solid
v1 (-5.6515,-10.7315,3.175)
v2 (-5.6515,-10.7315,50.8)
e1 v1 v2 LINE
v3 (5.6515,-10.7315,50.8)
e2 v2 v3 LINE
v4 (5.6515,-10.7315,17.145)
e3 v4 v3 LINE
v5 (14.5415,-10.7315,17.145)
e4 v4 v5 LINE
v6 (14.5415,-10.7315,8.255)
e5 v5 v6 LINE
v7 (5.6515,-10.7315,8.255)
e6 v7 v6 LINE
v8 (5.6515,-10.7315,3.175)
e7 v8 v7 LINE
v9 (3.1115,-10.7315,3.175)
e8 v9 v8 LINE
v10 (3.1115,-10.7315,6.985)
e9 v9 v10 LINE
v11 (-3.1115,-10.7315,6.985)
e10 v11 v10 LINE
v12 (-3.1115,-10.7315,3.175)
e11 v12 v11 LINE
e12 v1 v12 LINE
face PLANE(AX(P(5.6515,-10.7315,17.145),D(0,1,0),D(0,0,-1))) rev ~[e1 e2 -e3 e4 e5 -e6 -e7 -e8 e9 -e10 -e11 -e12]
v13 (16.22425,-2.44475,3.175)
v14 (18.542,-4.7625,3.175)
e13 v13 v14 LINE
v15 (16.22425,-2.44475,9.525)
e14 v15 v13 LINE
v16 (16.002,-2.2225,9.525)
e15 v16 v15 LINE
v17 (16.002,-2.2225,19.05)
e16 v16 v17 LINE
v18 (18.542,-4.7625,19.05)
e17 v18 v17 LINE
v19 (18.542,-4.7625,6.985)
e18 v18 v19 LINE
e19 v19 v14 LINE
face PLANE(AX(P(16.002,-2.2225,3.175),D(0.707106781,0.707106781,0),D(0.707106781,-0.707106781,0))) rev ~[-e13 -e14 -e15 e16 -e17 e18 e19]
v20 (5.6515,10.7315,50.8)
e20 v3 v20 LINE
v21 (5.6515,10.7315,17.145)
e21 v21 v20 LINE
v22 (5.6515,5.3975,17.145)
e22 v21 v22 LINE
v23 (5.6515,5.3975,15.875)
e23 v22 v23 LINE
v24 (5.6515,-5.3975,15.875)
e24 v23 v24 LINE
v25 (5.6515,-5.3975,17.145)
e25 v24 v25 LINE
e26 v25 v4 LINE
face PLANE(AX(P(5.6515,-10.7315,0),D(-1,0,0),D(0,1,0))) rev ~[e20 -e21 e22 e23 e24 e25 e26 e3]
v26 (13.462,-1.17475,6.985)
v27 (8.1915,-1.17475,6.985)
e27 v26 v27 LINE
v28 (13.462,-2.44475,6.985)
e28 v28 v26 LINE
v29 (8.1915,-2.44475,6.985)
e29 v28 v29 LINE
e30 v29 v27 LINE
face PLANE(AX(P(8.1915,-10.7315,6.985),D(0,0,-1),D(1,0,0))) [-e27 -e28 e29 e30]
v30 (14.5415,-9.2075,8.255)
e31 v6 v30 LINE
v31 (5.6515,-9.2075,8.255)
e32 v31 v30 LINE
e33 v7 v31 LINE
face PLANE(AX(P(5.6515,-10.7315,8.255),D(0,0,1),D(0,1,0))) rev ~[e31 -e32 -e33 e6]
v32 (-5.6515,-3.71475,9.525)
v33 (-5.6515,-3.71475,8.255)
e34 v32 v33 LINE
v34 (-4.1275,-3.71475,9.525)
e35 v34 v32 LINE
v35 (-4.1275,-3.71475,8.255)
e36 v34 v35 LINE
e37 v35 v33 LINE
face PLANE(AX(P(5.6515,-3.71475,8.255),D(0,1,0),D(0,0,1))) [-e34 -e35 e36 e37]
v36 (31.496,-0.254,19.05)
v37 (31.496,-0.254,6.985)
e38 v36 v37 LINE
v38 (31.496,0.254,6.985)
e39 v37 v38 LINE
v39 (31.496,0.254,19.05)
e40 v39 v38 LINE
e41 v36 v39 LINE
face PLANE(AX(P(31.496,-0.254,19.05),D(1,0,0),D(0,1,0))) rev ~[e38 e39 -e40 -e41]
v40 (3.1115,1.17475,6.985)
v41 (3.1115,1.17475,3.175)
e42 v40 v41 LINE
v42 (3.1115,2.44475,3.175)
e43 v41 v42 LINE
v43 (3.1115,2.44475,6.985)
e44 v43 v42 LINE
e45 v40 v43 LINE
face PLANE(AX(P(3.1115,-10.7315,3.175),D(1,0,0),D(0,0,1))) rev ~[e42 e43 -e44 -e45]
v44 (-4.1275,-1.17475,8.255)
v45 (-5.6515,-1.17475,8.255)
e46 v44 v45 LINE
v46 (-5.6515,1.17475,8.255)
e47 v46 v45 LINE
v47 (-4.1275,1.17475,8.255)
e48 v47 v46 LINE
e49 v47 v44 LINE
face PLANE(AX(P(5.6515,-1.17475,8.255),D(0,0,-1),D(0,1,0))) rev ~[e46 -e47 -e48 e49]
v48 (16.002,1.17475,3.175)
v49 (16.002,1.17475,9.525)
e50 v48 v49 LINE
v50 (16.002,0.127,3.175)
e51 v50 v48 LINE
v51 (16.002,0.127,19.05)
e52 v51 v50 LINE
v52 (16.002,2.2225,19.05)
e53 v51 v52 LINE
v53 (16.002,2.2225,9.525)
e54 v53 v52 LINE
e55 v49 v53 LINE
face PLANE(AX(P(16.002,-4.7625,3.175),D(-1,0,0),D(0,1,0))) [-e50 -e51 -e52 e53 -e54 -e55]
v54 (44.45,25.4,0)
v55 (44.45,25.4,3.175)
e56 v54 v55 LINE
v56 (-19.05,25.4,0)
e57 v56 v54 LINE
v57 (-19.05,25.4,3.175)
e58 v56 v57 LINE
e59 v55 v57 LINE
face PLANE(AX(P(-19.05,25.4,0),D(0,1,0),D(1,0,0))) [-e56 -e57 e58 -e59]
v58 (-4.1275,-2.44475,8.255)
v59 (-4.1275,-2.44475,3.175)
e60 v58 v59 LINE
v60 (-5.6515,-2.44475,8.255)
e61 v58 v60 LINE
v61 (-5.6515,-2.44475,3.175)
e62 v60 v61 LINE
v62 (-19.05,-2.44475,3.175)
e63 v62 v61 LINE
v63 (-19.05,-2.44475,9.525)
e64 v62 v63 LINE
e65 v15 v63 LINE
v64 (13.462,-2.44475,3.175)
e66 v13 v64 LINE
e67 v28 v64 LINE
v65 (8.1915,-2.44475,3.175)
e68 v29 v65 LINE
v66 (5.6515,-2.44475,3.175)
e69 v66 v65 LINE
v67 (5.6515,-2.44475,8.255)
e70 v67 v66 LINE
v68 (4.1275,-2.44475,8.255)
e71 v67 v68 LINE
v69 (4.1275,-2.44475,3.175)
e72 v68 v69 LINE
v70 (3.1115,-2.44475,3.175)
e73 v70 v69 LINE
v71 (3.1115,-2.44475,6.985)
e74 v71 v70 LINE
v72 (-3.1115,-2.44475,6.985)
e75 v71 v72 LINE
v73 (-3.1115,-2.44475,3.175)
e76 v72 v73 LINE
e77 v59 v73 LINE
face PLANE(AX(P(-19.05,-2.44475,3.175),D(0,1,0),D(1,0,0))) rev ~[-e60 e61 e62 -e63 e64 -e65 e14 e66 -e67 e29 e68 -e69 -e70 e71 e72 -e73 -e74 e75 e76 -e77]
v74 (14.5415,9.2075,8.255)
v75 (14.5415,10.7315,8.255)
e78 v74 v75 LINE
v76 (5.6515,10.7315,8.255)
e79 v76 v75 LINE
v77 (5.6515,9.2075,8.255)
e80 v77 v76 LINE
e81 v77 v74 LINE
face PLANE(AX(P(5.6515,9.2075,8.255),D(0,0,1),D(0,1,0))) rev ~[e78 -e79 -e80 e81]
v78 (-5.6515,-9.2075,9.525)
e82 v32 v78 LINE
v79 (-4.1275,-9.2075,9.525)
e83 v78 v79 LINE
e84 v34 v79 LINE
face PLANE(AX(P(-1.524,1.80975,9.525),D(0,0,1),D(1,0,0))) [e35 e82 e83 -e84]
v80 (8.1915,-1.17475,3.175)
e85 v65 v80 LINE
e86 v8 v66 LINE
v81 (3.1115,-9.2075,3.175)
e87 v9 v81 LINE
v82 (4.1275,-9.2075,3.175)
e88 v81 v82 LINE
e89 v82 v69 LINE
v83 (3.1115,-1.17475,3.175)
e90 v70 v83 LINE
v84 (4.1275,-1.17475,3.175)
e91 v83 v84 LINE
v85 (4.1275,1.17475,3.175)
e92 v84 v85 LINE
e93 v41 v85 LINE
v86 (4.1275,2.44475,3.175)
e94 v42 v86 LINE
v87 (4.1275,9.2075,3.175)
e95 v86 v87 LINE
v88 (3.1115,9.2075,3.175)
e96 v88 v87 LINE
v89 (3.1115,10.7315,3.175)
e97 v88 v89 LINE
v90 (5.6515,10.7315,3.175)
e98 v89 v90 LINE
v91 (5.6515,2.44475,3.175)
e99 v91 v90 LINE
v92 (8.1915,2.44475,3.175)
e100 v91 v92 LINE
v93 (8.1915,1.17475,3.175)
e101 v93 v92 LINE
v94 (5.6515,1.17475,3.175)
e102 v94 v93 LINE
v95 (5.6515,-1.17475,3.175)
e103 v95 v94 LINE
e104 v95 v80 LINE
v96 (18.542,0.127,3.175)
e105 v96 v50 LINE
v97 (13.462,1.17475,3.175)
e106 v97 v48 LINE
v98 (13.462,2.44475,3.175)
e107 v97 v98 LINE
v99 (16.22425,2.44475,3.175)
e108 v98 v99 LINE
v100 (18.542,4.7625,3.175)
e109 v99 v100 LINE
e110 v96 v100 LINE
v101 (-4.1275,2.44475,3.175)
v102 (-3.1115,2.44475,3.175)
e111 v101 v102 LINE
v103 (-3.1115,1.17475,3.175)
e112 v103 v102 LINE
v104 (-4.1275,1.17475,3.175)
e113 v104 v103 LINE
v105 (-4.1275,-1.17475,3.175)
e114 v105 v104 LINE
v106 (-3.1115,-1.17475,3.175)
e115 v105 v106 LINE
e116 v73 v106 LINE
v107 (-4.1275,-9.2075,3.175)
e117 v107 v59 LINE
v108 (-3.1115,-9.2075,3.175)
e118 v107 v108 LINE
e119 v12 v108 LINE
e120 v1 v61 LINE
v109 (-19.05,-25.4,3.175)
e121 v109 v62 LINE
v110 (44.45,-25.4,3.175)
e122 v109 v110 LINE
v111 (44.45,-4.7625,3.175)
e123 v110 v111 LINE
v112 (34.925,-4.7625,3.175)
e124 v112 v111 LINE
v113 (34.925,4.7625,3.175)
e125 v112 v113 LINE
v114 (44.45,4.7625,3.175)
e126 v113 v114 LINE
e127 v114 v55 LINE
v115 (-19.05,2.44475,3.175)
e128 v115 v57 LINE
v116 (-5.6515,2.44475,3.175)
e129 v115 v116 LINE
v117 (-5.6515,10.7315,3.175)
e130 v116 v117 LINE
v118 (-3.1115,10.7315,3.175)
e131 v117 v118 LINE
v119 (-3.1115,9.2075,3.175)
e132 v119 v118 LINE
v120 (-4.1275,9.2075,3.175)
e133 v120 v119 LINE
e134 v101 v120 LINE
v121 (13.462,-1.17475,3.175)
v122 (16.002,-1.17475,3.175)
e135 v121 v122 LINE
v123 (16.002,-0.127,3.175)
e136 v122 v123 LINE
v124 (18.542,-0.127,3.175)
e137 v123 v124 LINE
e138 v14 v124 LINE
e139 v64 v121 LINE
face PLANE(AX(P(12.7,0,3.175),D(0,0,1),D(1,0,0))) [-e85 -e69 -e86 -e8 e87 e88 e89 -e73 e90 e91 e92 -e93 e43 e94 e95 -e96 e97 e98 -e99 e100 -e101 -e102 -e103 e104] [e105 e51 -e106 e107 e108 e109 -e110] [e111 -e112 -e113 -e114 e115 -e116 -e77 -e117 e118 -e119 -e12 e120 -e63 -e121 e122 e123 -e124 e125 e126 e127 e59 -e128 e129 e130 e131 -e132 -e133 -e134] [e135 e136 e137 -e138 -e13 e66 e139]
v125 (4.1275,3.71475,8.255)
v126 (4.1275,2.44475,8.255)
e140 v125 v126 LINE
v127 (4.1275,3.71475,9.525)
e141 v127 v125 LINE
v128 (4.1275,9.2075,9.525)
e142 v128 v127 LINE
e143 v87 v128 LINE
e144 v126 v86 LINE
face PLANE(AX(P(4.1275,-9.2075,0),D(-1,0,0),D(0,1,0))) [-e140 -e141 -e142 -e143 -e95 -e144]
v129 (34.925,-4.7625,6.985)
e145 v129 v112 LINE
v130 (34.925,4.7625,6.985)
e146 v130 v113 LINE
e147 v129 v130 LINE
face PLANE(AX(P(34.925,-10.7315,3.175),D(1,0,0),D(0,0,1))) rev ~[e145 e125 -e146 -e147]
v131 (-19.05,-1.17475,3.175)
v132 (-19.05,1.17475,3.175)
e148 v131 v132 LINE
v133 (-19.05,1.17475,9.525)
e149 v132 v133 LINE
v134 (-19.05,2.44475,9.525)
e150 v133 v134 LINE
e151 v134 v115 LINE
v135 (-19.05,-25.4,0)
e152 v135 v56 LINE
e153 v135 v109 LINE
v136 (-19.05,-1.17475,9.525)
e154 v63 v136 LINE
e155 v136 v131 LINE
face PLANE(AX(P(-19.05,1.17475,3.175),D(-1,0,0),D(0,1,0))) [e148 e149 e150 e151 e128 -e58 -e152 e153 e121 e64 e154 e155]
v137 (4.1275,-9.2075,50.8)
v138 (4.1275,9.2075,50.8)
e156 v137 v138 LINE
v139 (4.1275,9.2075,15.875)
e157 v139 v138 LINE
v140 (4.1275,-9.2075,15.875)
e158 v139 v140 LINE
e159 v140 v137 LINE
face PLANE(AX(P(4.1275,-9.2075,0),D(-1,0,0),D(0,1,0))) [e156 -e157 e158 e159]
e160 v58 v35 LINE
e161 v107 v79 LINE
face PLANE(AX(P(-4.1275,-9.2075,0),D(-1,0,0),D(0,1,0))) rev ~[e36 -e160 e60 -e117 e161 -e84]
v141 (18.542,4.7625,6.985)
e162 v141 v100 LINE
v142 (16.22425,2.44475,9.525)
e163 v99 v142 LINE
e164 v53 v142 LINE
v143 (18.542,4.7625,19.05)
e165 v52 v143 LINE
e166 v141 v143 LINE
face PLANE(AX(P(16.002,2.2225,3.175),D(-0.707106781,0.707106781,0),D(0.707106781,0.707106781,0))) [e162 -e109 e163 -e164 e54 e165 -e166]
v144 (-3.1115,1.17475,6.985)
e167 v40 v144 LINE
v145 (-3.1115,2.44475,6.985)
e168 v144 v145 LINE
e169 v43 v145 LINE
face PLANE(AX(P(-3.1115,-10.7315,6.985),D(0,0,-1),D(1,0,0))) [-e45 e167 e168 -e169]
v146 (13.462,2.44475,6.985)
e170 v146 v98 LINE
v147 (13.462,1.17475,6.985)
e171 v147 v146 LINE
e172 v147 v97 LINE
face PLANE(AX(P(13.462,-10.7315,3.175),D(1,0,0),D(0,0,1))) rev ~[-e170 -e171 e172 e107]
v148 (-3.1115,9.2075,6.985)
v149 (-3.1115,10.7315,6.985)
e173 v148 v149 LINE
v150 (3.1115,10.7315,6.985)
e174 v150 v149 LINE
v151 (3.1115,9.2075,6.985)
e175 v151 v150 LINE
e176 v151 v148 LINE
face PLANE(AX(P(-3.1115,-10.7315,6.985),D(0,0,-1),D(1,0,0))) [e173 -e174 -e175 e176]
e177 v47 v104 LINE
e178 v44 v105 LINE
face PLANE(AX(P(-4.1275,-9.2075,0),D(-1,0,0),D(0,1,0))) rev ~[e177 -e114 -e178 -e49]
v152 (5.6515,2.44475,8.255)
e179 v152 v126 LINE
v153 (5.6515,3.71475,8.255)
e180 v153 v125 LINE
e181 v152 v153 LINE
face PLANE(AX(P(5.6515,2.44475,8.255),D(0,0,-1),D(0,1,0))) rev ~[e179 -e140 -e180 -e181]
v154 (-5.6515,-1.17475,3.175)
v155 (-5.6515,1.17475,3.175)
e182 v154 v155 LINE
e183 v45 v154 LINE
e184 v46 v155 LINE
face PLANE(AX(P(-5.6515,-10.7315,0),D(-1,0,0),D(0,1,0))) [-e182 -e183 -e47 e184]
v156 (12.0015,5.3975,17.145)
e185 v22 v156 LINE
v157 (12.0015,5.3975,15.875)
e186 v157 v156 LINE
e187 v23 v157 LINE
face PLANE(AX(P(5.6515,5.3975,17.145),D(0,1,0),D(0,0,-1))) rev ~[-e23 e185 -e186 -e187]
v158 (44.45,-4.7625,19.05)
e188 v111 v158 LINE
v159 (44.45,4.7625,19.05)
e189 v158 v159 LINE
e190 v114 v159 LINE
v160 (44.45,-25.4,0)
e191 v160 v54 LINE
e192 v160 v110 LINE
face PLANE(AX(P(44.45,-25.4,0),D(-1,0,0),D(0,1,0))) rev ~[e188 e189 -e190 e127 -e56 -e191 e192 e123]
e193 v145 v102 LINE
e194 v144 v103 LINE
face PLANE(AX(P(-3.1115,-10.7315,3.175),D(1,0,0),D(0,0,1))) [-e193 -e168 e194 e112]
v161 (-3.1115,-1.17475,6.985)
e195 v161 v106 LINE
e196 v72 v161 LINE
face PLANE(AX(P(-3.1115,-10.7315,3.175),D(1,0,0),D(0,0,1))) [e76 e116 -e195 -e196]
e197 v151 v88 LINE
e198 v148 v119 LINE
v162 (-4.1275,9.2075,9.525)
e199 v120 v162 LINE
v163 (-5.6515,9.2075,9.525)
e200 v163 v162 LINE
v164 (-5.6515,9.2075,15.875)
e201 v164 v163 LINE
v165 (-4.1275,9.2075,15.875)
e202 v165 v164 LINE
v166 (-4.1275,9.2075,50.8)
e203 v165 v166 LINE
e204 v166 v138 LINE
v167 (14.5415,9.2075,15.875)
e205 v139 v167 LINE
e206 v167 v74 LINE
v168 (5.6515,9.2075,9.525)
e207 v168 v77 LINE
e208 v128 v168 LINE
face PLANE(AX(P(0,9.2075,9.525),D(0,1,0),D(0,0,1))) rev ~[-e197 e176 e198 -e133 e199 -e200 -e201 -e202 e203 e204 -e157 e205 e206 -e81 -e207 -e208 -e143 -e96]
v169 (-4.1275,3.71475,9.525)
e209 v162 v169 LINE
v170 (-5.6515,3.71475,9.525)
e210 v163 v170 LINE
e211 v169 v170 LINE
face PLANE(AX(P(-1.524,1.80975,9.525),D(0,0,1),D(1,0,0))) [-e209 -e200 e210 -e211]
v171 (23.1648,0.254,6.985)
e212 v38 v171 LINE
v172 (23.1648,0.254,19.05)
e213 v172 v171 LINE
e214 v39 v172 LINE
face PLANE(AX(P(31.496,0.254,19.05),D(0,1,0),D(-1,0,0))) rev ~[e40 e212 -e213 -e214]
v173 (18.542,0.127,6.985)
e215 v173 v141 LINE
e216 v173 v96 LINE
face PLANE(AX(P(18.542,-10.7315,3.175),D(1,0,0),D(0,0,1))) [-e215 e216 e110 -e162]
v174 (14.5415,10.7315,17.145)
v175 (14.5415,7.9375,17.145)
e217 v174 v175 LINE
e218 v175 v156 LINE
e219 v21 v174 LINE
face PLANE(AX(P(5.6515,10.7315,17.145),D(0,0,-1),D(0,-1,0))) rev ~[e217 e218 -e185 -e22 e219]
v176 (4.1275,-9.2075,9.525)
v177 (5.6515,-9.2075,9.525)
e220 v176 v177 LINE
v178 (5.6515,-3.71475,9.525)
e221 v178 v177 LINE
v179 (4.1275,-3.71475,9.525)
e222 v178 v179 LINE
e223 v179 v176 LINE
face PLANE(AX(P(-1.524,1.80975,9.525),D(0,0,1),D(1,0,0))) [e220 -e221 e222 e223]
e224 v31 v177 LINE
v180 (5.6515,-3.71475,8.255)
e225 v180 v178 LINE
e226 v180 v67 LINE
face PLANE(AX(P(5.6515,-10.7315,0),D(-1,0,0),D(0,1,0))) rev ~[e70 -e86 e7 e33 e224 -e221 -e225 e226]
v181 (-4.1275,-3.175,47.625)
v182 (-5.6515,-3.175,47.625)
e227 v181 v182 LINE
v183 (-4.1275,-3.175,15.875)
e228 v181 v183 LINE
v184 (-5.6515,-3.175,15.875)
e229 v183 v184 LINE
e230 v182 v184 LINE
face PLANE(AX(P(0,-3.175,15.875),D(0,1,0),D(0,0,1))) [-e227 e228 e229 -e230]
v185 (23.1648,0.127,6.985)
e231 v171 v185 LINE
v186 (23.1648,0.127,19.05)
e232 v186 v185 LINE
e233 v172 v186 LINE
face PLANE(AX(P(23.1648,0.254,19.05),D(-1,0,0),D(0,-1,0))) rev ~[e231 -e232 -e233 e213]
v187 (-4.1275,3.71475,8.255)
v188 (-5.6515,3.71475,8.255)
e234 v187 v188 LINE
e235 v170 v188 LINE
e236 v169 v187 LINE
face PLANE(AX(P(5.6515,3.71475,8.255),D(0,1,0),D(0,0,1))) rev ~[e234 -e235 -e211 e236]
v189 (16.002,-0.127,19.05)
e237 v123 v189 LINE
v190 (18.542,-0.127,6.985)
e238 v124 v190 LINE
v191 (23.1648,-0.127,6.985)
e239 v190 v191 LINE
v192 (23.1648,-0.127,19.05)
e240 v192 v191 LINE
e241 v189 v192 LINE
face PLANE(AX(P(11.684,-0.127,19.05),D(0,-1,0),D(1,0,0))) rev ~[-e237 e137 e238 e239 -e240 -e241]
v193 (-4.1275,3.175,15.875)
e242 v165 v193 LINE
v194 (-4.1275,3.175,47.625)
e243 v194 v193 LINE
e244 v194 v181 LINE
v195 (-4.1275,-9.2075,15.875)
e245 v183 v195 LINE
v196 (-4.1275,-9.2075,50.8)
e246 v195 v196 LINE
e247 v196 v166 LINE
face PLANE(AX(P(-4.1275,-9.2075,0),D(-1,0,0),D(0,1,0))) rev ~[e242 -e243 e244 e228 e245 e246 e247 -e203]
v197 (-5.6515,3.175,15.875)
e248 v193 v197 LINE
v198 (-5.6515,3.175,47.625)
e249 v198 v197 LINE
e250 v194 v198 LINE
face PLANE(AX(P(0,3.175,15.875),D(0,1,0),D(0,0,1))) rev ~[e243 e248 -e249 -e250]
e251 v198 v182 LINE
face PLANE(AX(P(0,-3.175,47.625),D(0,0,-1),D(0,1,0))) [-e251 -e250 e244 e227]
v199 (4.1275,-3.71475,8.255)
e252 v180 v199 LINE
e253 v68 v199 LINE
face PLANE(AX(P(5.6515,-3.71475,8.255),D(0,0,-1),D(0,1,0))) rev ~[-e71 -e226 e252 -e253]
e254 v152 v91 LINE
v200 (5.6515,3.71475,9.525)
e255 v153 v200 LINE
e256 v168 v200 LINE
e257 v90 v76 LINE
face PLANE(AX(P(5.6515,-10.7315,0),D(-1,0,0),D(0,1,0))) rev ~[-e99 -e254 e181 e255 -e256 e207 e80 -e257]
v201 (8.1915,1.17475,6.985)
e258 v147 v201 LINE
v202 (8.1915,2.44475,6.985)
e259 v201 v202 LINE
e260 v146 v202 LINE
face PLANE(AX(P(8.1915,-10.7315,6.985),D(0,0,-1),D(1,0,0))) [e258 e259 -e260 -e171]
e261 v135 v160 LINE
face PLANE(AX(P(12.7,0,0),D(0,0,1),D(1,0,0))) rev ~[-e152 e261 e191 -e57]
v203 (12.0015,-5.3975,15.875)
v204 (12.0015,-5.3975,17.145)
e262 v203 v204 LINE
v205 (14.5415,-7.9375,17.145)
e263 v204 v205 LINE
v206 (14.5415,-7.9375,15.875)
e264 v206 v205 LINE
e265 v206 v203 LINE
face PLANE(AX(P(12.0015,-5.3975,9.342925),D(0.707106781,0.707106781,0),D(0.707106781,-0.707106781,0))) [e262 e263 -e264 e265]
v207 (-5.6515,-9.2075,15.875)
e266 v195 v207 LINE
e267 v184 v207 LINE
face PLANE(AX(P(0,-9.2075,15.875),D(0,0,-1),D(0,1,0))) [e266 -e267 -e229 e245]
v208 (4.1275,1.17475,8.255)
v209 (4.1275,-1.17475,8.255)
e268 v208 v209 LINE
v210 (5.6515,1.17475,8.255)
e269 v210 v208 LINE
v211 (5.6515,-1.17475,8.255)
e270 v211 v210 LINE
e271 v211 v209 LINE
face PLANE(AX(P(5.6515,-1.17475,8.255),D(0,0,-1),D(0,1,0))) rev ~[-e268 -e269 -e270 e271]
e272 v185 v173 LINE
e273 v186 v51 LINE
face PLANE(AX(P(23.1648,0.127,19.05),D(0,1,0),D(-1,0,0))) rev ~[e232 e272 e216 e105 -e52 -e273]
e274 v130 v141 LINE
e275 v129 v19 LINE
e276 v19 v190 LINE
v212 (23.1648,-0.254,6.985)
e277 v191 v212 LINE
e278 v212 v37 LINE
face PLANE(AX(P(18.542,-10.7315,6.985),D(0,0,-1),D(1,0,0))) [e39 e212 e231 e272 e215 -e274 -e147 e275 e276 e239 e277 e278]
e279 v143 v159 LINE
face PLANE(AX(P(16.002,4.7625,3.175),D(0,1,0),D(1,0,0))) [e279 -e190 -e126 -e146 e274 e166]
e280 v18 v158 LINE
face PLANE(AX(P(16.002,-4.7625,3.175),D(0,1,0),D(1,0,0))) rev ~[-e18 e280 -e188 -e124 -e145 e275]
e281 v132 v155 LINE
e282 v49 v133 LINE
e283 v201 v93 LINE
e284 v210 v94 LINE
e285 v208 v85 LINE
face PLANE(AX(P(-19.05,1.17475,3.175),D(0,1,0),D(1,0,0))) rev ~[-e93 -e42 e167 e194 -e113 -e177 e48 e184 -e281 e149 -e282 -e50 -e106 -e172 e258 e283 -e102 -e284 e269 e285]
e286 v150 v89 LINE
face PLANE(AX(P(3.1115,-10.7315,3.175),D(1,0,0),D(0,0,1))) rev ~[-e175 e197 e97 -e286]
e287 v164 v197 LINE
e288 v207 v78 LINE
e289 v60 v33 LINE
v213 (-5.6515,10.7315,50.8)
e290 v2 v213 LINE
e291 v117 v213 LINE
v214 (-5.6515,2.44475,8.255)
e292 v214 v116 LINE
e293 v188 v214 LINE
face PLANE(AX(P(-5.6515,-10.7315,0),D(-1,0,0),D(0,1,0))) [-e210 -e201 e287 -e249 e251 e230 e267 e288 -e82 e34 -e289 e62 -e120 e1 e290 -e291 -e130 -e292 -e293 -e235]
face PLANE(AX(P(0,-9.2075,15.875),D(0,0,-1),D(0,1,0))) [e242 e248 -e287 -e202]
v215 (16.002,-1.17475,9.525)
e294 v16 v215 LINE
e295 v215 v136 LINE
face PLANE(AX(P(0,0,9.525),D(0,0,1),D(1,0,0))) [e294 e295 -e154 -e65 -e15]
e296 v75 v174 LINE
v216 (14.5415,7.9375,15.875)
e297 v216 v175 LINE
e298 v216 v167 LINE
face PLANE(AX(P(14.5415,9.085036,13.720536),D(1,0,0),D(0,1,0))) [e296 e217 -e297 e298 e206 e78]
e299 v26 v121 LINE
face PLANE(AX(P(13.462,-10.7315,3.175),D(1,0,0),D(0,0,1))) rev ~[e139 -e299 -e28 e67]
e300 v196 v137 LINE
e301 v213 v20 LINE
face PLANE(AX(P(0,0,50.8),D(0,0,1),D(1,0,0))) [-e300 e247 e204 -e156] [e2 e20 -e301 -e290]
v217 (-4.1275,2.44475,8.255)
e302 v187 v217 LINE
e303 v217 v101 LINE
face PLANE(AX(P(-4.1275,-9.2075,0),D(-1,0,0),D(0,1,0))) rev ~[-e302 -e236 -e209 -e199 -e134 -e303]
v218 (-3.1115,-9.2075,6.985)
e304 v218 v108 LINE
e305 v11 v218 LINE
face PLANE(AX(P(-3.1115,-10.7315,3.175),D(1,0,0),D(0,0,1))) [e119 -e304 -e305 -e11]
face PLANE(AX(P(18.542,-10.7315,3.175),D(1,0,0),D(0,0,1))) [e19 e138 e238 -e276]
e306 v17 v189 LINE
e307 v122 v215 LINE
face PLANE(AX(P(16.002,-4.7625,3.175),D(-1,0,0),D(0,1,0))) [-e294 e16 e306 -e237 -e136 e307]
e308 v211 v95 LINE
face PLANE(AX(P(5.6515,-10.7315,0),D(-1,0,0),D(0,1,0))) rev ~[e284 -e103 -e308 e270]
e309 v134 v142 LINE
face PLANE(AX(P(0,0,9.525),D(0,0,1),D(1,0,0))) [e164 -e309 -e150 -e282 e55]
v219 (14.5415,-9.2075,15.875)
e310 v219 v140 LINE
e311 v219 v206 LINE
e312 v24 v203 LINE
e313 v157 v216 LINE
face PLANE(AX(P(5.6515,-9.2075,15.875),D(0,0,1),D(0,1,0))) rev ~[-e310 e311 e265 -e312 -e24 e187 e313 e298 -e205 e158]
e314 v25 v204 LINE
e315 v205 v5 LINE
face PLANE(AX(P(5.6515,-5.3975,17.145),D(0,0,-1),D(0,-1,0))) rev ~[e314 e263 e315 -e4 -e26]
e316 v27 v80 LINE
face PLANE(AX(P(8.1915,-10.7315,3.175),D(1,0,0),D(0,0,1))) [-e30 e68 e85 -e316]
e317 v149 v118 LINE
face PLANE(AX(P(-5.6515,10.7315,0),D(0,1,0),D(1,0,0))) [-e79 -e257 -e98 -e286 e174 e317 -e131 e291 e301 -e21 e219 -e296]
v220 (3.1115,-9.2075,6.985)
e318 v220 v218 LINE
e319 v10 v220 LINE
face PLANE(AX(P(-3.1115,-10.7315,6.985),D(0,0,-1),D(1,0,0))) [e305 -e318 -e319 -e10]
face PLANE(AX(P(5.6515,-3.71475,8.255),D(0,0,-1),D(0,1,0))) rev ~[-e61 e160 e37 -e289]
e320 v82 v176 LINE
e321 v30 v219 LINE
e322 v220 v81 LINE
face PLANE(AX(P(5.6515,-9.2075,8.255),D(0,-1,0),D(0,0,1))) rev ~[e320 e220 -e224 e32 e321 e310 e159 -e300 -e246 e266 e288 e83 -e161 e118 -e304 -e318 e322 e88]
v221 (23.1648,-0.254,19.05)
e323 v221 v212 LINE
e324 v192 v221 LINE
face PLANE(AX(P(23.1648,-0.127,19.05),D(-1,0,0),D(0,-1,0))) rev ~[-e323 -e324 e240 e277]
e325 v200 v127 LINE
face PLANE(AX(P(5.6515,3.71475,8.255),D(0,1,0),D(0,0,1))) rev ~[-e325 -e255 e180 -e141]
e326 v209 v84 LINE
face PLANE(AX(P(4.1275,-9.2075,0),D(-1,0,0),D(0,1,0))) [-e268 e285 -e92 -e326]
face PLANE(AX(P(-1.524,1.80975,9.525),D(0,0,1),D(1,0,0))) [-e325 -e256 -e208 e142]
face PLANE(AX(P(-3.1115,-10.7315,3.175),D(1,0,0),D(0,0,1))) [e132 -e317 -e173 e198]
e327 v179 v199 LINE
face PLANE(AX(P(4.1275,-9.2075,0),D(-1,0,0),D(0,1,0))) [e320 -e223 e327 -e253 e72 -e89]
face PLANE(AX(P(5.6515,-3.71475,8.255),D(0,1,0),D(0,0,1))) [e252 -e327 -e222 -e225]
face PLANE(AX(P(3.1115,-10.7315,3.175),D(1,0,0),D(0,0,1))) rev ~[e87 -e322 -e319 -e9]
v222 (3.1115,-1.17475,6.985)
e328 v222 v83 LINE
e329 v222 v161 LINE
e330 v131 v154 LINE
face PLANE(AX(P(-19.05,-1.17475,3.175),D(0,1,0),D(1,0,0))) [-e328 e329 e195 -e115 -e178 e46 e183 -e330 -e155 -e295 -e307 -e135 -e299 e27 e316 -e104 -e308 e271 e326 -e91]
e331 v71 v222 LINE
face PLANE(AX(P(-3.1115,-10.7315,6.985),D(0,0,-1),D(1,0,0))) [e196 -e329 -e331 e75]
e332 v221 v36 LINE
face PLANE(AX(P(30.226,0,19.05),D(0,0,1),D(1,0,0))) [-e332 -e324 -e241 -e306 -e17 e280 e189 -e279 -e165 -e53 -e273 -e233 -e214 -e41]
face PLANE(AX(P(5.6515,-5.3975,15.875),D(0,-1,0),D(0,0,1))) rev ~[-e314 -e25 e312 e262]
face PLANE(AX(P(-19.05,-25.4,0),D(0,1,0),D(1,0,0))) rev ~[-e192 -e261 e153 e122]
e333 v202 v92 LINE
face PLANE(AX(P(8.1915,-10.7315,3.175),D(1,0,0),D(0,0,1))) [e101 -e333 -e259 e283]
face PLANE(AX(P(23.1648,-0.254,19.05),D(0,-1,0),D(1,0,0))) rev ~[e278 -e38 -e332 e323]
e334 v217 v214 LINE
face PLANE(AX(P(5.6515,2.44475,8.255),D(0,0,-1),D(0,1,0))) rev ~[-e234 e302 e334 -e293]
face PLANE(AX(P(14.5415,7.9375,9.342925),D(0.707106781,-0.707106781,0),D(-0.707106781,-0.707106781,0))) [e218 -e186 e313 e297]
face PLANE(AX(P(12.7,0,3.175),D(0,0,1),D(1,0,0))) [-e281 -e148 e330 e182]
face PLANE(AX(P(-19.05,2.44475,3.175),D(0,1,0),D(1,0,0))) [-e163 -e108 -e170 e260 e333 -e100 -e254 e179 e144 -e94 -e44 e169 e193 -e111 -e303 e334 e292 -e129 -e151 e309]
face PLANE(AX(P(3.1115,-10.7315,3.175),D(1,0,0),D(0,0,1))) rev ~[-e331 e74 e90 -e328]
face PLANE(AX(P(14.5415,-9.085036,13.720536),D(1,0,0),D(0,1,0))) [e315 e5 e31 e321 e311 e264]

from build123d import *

# Parameters (mm, degrees)
F0_W          = 11.303
F0_H          = 21.463
F0_W_2        = 8.255
F0_H_2        = 18.415
F1_DEPTH      = 50.8
F2_W          = 18.415
F2_H          = 6.35
F3_DEPTH      = 12.7
F4_W          = 6.35
F4_H          = 31.75
F5_DEPTH      = 25.4
F6_W          = 63.5
F6_H          = 50.8
F7_DEPTH      = 3.175
F8_W          = 28.448
F8_H          = 9.525
F9_DEPTH      = 15.875
F11_DEPTH     = 15.875
F12_W         = 35.052
F12_H         = 1.27
F13_DEPTH     = 6.35
F14_W         = 1.27
F14_H         = 1.27
F14_W_2       = 2.3495
F15_DEPTH     = 24.7025
F16_W         = 6.223
F16_H         = 3.81
F16_W_2       = 5.2705
F16_W_3       = 16.383
F17_DEPTH     = 36.1325
F19_DEPTH     = 8.89
F20_T1_DEPTH  = 14.3341495789
F20_T6_DEPTH  = 22.4070747894
F20_T11_DEPTH = 28.9391495789
F20_T16_DEPTH = 22.4070747894
F20_T21_DEPTH = 28.9391495789


# Not quite as in the source:
# - a fillet or chamfer that OpenCascade refuses, or shapes differently, is made with other operations: its cross-section is extruded or revolved along the edge and cut away or added


with BuildPart() as f1:
    # F0 (on Top) → F1 (new body)
    with BuildSketch(Plane.XY):
        Rectangle(F0_W, F0_H)
        Rectangle(F0_W_2, F0_H_2, mode=Mode.SUBTRACT)
    extrude(amount=F1_DEPTH)

    # F2 (on Right) → F3 (cut, symmetric)
    with BuildSketch(Plane.YZ):
        with Locations((0, 12.7)):
            Rectangle(F2_W, F2_H)
    extrude(amount=F3_DEPTH, both=True, mode=Mode.SUBTRACT)

    # F4 (on Right) → F5 (cut)
    with BuildSketch(Plane.YZ):
        with Locations((0, 31.75)):
            Rectangle(F4_W, F4_H)
    extrude(amount=-F5_DEPTH, mode=Mode.SUBTRACT)

    # F6 (on Top) → F7 (join)
    with BuildSketch(Plane.XY):
        with Locations((12.7, 0)):
            Rectangle(F6_W, F6_H)
    extrude(amount=F7_DEPTH)

    # F8 (on face) → F9 (join)
    with BuildSketch(Plane.XY.offset(3.175)):
        with Locations((30.226, 0)):
            Rectangle(F8_W, F8_H)
    extrude(amount=F9_DEPTH)

    # F10 (on face) → F11 (cut, through all)
    with BuildSketch(Plane.XY.offset(19.05)):
        Polygon((11.684, 0.127), (11.684, -0.127), (23.1648, -0.127), (23.1648, -0.254), (31.496, -0.254), (31.496, 0.254), (23.1648, 0.254), (23.1648, 0.127), align=None)
    extrude(amount=-F11_DEPTH, mode=Mode.SUBTRACT)

    # F12 (on face) → F13 (join)
    with BuildSketch(Plane.XY.offset(3.175)):
        with Locations((-1.524, 1.80975)):
            Rectangle(F12_W, F12_H)
        with Locations((-1.524, -1.80975)):
            Rectangle(F12_W, F12_H)
    extrude(amount=F13_DEPTH)

    # F14 (on face) → F15 (cut, through all)
    with BuildSketch(Plane.YZ.offset(5.6515)):
        with Locations((-3.07975, 8.89)):
            Rectangle(F14_W, F14_H)
        with Locations((0, 8.89)):
            Rectangle(F14_W_2, F14_H)
        with Locations((3.07975, 8.89)):
            Rectangle(F14_W, F14_H)
    extrude(amount=-F15_DEPTH, mode=Mode.SUBTRACT)

    # F16 (on face) → F17 (cut, through all)
    with BuildSketch(Plane.XZ.offset(10.7315)):
        with Locations((0, 5.08)):
            Rectangle(F16_W, F16_H)
        with Locations((10.82675, 5.08)):
            Rectangle(F16_W_2, F16_H)
        with Locations((26.7335, 5.08)):
            Rectangle(F16_W_3, F16_H)
    extrude(amount=-F17_DEPTH, mode=Mode.SUBTRACT)

    # F18 (on face) → F19 (join)
    with BuildSketch(Plane.YZ.offset(5.6515)):
        Polygon((-9.2075, 15.875), (-5.3975, 15.875), (-5.3975, 17.145), (-10.7315, 17.145), (-10.7315, 8.255), (-9.2075, 8.255), align=None)
        Polygon((10.7315, 17.145), (5.3975, 17.145), (5.3975, 15.875), (9.2075, 15.875), (9.2075, 8.255), (10.7315, 8.255), align=None)
    extrude(amount=F19_DEPTH)

    # F20: chamfer of 2.54 on 4 edges, made by hand

    # F20_s2 → F20_t1 (cut)
    with BuildSketch(Plane.XY.offset(9.3429252106)):
        Polygon((14.5415, 7.9375), (12.0015, 5.3975), (14.5415, 5.3975), align=None)
        Polygon((12.0015, -5.3975), (14.5415, -7.9375), (14.5415, -5.3975), align=None)
    extrude(amount=F20_T1_DEPTH, mode=Mode.SUBTRACT)


with BuildPart() as f20_tool4:
    # F20_s5 → F20_t6 (new body)
    with BuildSketch(Plane.XY.offset(3.175)):
        Polygon((16.002, -2.2225), (18.542, -4.7625), (16.002, -4.7625), align=None)
    extrude(amount=F20_T6_DEPTH)

    split(bisect_by=Plane.XZ.offset(2.44475), keep=Keep.TOP)


with BuildPart() as f1_1:
    add(f1.part)

    # F20_t3: cut F20_tool4
    add(f20_tool4.part, mode=Mode.SUBTRACT)


with BuildPart() as f20_tool9:
    # F20_s10 → F20_t11 (new body)
    with BuildSketch(Plane.XY.offset(-3.3570747894)):
        Polygon((16.002, -2.2225), (18.542, -4.7625), (16.002, -4.7625), align=None)
    extrude(amount=F20_T11_DEPTH)

    split(bisect_by=Plane.XY.offset(9.525), keep=Keep.TOP)


with BuildPart() as f1_2:
    add(f1_1.part)

    # F20_t8: cut F20_tool9
    add(f20_tool9.part, mode=Mode.SUBTRACT)


with BuildPart() as f20_tool14:
    # F20_s15 → F20_t16 (new body)
    with BuildSketch(Plane.XY.offset(3.175)):
        Polygon((16.002, 2.2225), (18.542, 4.7625), (16.002, 4.7625), align=None)
    extrude(amount=F20_T16_DEPTH)

    split(bisect_by=Plane.XZ.offset(-2.44475), keep=Keep.BOTTOM)


with BuildPart() as f1_3:
    add(f1_2.part)

    # F20_t13: cut F20_tool14
    add(f20_tool14.part, mode=Mode.SUBTRACT)


with BuildPart() as f20_tool19:
    # F20_s20 → F20_t21 (new body)
    with BuildSketch(Plane.XY.offset(-3.3570747894)):
        Polygon((16.002, 2.2225), (18.542, 4.7625), (16.002, 4.7625), align=None)
    extrude(amount=F20_T21_DEPTH)

    split(bisect_by=Plane.XY.offset(9.525), keep=Keep.TOP)


with BuildPart() as f1_4:
    add(f1_3.part)

    # F20_t18: cut F20_tool19
    add(f20_tool19.part, mode=Mode.SUBTRACT)


solid = f1_4.part
